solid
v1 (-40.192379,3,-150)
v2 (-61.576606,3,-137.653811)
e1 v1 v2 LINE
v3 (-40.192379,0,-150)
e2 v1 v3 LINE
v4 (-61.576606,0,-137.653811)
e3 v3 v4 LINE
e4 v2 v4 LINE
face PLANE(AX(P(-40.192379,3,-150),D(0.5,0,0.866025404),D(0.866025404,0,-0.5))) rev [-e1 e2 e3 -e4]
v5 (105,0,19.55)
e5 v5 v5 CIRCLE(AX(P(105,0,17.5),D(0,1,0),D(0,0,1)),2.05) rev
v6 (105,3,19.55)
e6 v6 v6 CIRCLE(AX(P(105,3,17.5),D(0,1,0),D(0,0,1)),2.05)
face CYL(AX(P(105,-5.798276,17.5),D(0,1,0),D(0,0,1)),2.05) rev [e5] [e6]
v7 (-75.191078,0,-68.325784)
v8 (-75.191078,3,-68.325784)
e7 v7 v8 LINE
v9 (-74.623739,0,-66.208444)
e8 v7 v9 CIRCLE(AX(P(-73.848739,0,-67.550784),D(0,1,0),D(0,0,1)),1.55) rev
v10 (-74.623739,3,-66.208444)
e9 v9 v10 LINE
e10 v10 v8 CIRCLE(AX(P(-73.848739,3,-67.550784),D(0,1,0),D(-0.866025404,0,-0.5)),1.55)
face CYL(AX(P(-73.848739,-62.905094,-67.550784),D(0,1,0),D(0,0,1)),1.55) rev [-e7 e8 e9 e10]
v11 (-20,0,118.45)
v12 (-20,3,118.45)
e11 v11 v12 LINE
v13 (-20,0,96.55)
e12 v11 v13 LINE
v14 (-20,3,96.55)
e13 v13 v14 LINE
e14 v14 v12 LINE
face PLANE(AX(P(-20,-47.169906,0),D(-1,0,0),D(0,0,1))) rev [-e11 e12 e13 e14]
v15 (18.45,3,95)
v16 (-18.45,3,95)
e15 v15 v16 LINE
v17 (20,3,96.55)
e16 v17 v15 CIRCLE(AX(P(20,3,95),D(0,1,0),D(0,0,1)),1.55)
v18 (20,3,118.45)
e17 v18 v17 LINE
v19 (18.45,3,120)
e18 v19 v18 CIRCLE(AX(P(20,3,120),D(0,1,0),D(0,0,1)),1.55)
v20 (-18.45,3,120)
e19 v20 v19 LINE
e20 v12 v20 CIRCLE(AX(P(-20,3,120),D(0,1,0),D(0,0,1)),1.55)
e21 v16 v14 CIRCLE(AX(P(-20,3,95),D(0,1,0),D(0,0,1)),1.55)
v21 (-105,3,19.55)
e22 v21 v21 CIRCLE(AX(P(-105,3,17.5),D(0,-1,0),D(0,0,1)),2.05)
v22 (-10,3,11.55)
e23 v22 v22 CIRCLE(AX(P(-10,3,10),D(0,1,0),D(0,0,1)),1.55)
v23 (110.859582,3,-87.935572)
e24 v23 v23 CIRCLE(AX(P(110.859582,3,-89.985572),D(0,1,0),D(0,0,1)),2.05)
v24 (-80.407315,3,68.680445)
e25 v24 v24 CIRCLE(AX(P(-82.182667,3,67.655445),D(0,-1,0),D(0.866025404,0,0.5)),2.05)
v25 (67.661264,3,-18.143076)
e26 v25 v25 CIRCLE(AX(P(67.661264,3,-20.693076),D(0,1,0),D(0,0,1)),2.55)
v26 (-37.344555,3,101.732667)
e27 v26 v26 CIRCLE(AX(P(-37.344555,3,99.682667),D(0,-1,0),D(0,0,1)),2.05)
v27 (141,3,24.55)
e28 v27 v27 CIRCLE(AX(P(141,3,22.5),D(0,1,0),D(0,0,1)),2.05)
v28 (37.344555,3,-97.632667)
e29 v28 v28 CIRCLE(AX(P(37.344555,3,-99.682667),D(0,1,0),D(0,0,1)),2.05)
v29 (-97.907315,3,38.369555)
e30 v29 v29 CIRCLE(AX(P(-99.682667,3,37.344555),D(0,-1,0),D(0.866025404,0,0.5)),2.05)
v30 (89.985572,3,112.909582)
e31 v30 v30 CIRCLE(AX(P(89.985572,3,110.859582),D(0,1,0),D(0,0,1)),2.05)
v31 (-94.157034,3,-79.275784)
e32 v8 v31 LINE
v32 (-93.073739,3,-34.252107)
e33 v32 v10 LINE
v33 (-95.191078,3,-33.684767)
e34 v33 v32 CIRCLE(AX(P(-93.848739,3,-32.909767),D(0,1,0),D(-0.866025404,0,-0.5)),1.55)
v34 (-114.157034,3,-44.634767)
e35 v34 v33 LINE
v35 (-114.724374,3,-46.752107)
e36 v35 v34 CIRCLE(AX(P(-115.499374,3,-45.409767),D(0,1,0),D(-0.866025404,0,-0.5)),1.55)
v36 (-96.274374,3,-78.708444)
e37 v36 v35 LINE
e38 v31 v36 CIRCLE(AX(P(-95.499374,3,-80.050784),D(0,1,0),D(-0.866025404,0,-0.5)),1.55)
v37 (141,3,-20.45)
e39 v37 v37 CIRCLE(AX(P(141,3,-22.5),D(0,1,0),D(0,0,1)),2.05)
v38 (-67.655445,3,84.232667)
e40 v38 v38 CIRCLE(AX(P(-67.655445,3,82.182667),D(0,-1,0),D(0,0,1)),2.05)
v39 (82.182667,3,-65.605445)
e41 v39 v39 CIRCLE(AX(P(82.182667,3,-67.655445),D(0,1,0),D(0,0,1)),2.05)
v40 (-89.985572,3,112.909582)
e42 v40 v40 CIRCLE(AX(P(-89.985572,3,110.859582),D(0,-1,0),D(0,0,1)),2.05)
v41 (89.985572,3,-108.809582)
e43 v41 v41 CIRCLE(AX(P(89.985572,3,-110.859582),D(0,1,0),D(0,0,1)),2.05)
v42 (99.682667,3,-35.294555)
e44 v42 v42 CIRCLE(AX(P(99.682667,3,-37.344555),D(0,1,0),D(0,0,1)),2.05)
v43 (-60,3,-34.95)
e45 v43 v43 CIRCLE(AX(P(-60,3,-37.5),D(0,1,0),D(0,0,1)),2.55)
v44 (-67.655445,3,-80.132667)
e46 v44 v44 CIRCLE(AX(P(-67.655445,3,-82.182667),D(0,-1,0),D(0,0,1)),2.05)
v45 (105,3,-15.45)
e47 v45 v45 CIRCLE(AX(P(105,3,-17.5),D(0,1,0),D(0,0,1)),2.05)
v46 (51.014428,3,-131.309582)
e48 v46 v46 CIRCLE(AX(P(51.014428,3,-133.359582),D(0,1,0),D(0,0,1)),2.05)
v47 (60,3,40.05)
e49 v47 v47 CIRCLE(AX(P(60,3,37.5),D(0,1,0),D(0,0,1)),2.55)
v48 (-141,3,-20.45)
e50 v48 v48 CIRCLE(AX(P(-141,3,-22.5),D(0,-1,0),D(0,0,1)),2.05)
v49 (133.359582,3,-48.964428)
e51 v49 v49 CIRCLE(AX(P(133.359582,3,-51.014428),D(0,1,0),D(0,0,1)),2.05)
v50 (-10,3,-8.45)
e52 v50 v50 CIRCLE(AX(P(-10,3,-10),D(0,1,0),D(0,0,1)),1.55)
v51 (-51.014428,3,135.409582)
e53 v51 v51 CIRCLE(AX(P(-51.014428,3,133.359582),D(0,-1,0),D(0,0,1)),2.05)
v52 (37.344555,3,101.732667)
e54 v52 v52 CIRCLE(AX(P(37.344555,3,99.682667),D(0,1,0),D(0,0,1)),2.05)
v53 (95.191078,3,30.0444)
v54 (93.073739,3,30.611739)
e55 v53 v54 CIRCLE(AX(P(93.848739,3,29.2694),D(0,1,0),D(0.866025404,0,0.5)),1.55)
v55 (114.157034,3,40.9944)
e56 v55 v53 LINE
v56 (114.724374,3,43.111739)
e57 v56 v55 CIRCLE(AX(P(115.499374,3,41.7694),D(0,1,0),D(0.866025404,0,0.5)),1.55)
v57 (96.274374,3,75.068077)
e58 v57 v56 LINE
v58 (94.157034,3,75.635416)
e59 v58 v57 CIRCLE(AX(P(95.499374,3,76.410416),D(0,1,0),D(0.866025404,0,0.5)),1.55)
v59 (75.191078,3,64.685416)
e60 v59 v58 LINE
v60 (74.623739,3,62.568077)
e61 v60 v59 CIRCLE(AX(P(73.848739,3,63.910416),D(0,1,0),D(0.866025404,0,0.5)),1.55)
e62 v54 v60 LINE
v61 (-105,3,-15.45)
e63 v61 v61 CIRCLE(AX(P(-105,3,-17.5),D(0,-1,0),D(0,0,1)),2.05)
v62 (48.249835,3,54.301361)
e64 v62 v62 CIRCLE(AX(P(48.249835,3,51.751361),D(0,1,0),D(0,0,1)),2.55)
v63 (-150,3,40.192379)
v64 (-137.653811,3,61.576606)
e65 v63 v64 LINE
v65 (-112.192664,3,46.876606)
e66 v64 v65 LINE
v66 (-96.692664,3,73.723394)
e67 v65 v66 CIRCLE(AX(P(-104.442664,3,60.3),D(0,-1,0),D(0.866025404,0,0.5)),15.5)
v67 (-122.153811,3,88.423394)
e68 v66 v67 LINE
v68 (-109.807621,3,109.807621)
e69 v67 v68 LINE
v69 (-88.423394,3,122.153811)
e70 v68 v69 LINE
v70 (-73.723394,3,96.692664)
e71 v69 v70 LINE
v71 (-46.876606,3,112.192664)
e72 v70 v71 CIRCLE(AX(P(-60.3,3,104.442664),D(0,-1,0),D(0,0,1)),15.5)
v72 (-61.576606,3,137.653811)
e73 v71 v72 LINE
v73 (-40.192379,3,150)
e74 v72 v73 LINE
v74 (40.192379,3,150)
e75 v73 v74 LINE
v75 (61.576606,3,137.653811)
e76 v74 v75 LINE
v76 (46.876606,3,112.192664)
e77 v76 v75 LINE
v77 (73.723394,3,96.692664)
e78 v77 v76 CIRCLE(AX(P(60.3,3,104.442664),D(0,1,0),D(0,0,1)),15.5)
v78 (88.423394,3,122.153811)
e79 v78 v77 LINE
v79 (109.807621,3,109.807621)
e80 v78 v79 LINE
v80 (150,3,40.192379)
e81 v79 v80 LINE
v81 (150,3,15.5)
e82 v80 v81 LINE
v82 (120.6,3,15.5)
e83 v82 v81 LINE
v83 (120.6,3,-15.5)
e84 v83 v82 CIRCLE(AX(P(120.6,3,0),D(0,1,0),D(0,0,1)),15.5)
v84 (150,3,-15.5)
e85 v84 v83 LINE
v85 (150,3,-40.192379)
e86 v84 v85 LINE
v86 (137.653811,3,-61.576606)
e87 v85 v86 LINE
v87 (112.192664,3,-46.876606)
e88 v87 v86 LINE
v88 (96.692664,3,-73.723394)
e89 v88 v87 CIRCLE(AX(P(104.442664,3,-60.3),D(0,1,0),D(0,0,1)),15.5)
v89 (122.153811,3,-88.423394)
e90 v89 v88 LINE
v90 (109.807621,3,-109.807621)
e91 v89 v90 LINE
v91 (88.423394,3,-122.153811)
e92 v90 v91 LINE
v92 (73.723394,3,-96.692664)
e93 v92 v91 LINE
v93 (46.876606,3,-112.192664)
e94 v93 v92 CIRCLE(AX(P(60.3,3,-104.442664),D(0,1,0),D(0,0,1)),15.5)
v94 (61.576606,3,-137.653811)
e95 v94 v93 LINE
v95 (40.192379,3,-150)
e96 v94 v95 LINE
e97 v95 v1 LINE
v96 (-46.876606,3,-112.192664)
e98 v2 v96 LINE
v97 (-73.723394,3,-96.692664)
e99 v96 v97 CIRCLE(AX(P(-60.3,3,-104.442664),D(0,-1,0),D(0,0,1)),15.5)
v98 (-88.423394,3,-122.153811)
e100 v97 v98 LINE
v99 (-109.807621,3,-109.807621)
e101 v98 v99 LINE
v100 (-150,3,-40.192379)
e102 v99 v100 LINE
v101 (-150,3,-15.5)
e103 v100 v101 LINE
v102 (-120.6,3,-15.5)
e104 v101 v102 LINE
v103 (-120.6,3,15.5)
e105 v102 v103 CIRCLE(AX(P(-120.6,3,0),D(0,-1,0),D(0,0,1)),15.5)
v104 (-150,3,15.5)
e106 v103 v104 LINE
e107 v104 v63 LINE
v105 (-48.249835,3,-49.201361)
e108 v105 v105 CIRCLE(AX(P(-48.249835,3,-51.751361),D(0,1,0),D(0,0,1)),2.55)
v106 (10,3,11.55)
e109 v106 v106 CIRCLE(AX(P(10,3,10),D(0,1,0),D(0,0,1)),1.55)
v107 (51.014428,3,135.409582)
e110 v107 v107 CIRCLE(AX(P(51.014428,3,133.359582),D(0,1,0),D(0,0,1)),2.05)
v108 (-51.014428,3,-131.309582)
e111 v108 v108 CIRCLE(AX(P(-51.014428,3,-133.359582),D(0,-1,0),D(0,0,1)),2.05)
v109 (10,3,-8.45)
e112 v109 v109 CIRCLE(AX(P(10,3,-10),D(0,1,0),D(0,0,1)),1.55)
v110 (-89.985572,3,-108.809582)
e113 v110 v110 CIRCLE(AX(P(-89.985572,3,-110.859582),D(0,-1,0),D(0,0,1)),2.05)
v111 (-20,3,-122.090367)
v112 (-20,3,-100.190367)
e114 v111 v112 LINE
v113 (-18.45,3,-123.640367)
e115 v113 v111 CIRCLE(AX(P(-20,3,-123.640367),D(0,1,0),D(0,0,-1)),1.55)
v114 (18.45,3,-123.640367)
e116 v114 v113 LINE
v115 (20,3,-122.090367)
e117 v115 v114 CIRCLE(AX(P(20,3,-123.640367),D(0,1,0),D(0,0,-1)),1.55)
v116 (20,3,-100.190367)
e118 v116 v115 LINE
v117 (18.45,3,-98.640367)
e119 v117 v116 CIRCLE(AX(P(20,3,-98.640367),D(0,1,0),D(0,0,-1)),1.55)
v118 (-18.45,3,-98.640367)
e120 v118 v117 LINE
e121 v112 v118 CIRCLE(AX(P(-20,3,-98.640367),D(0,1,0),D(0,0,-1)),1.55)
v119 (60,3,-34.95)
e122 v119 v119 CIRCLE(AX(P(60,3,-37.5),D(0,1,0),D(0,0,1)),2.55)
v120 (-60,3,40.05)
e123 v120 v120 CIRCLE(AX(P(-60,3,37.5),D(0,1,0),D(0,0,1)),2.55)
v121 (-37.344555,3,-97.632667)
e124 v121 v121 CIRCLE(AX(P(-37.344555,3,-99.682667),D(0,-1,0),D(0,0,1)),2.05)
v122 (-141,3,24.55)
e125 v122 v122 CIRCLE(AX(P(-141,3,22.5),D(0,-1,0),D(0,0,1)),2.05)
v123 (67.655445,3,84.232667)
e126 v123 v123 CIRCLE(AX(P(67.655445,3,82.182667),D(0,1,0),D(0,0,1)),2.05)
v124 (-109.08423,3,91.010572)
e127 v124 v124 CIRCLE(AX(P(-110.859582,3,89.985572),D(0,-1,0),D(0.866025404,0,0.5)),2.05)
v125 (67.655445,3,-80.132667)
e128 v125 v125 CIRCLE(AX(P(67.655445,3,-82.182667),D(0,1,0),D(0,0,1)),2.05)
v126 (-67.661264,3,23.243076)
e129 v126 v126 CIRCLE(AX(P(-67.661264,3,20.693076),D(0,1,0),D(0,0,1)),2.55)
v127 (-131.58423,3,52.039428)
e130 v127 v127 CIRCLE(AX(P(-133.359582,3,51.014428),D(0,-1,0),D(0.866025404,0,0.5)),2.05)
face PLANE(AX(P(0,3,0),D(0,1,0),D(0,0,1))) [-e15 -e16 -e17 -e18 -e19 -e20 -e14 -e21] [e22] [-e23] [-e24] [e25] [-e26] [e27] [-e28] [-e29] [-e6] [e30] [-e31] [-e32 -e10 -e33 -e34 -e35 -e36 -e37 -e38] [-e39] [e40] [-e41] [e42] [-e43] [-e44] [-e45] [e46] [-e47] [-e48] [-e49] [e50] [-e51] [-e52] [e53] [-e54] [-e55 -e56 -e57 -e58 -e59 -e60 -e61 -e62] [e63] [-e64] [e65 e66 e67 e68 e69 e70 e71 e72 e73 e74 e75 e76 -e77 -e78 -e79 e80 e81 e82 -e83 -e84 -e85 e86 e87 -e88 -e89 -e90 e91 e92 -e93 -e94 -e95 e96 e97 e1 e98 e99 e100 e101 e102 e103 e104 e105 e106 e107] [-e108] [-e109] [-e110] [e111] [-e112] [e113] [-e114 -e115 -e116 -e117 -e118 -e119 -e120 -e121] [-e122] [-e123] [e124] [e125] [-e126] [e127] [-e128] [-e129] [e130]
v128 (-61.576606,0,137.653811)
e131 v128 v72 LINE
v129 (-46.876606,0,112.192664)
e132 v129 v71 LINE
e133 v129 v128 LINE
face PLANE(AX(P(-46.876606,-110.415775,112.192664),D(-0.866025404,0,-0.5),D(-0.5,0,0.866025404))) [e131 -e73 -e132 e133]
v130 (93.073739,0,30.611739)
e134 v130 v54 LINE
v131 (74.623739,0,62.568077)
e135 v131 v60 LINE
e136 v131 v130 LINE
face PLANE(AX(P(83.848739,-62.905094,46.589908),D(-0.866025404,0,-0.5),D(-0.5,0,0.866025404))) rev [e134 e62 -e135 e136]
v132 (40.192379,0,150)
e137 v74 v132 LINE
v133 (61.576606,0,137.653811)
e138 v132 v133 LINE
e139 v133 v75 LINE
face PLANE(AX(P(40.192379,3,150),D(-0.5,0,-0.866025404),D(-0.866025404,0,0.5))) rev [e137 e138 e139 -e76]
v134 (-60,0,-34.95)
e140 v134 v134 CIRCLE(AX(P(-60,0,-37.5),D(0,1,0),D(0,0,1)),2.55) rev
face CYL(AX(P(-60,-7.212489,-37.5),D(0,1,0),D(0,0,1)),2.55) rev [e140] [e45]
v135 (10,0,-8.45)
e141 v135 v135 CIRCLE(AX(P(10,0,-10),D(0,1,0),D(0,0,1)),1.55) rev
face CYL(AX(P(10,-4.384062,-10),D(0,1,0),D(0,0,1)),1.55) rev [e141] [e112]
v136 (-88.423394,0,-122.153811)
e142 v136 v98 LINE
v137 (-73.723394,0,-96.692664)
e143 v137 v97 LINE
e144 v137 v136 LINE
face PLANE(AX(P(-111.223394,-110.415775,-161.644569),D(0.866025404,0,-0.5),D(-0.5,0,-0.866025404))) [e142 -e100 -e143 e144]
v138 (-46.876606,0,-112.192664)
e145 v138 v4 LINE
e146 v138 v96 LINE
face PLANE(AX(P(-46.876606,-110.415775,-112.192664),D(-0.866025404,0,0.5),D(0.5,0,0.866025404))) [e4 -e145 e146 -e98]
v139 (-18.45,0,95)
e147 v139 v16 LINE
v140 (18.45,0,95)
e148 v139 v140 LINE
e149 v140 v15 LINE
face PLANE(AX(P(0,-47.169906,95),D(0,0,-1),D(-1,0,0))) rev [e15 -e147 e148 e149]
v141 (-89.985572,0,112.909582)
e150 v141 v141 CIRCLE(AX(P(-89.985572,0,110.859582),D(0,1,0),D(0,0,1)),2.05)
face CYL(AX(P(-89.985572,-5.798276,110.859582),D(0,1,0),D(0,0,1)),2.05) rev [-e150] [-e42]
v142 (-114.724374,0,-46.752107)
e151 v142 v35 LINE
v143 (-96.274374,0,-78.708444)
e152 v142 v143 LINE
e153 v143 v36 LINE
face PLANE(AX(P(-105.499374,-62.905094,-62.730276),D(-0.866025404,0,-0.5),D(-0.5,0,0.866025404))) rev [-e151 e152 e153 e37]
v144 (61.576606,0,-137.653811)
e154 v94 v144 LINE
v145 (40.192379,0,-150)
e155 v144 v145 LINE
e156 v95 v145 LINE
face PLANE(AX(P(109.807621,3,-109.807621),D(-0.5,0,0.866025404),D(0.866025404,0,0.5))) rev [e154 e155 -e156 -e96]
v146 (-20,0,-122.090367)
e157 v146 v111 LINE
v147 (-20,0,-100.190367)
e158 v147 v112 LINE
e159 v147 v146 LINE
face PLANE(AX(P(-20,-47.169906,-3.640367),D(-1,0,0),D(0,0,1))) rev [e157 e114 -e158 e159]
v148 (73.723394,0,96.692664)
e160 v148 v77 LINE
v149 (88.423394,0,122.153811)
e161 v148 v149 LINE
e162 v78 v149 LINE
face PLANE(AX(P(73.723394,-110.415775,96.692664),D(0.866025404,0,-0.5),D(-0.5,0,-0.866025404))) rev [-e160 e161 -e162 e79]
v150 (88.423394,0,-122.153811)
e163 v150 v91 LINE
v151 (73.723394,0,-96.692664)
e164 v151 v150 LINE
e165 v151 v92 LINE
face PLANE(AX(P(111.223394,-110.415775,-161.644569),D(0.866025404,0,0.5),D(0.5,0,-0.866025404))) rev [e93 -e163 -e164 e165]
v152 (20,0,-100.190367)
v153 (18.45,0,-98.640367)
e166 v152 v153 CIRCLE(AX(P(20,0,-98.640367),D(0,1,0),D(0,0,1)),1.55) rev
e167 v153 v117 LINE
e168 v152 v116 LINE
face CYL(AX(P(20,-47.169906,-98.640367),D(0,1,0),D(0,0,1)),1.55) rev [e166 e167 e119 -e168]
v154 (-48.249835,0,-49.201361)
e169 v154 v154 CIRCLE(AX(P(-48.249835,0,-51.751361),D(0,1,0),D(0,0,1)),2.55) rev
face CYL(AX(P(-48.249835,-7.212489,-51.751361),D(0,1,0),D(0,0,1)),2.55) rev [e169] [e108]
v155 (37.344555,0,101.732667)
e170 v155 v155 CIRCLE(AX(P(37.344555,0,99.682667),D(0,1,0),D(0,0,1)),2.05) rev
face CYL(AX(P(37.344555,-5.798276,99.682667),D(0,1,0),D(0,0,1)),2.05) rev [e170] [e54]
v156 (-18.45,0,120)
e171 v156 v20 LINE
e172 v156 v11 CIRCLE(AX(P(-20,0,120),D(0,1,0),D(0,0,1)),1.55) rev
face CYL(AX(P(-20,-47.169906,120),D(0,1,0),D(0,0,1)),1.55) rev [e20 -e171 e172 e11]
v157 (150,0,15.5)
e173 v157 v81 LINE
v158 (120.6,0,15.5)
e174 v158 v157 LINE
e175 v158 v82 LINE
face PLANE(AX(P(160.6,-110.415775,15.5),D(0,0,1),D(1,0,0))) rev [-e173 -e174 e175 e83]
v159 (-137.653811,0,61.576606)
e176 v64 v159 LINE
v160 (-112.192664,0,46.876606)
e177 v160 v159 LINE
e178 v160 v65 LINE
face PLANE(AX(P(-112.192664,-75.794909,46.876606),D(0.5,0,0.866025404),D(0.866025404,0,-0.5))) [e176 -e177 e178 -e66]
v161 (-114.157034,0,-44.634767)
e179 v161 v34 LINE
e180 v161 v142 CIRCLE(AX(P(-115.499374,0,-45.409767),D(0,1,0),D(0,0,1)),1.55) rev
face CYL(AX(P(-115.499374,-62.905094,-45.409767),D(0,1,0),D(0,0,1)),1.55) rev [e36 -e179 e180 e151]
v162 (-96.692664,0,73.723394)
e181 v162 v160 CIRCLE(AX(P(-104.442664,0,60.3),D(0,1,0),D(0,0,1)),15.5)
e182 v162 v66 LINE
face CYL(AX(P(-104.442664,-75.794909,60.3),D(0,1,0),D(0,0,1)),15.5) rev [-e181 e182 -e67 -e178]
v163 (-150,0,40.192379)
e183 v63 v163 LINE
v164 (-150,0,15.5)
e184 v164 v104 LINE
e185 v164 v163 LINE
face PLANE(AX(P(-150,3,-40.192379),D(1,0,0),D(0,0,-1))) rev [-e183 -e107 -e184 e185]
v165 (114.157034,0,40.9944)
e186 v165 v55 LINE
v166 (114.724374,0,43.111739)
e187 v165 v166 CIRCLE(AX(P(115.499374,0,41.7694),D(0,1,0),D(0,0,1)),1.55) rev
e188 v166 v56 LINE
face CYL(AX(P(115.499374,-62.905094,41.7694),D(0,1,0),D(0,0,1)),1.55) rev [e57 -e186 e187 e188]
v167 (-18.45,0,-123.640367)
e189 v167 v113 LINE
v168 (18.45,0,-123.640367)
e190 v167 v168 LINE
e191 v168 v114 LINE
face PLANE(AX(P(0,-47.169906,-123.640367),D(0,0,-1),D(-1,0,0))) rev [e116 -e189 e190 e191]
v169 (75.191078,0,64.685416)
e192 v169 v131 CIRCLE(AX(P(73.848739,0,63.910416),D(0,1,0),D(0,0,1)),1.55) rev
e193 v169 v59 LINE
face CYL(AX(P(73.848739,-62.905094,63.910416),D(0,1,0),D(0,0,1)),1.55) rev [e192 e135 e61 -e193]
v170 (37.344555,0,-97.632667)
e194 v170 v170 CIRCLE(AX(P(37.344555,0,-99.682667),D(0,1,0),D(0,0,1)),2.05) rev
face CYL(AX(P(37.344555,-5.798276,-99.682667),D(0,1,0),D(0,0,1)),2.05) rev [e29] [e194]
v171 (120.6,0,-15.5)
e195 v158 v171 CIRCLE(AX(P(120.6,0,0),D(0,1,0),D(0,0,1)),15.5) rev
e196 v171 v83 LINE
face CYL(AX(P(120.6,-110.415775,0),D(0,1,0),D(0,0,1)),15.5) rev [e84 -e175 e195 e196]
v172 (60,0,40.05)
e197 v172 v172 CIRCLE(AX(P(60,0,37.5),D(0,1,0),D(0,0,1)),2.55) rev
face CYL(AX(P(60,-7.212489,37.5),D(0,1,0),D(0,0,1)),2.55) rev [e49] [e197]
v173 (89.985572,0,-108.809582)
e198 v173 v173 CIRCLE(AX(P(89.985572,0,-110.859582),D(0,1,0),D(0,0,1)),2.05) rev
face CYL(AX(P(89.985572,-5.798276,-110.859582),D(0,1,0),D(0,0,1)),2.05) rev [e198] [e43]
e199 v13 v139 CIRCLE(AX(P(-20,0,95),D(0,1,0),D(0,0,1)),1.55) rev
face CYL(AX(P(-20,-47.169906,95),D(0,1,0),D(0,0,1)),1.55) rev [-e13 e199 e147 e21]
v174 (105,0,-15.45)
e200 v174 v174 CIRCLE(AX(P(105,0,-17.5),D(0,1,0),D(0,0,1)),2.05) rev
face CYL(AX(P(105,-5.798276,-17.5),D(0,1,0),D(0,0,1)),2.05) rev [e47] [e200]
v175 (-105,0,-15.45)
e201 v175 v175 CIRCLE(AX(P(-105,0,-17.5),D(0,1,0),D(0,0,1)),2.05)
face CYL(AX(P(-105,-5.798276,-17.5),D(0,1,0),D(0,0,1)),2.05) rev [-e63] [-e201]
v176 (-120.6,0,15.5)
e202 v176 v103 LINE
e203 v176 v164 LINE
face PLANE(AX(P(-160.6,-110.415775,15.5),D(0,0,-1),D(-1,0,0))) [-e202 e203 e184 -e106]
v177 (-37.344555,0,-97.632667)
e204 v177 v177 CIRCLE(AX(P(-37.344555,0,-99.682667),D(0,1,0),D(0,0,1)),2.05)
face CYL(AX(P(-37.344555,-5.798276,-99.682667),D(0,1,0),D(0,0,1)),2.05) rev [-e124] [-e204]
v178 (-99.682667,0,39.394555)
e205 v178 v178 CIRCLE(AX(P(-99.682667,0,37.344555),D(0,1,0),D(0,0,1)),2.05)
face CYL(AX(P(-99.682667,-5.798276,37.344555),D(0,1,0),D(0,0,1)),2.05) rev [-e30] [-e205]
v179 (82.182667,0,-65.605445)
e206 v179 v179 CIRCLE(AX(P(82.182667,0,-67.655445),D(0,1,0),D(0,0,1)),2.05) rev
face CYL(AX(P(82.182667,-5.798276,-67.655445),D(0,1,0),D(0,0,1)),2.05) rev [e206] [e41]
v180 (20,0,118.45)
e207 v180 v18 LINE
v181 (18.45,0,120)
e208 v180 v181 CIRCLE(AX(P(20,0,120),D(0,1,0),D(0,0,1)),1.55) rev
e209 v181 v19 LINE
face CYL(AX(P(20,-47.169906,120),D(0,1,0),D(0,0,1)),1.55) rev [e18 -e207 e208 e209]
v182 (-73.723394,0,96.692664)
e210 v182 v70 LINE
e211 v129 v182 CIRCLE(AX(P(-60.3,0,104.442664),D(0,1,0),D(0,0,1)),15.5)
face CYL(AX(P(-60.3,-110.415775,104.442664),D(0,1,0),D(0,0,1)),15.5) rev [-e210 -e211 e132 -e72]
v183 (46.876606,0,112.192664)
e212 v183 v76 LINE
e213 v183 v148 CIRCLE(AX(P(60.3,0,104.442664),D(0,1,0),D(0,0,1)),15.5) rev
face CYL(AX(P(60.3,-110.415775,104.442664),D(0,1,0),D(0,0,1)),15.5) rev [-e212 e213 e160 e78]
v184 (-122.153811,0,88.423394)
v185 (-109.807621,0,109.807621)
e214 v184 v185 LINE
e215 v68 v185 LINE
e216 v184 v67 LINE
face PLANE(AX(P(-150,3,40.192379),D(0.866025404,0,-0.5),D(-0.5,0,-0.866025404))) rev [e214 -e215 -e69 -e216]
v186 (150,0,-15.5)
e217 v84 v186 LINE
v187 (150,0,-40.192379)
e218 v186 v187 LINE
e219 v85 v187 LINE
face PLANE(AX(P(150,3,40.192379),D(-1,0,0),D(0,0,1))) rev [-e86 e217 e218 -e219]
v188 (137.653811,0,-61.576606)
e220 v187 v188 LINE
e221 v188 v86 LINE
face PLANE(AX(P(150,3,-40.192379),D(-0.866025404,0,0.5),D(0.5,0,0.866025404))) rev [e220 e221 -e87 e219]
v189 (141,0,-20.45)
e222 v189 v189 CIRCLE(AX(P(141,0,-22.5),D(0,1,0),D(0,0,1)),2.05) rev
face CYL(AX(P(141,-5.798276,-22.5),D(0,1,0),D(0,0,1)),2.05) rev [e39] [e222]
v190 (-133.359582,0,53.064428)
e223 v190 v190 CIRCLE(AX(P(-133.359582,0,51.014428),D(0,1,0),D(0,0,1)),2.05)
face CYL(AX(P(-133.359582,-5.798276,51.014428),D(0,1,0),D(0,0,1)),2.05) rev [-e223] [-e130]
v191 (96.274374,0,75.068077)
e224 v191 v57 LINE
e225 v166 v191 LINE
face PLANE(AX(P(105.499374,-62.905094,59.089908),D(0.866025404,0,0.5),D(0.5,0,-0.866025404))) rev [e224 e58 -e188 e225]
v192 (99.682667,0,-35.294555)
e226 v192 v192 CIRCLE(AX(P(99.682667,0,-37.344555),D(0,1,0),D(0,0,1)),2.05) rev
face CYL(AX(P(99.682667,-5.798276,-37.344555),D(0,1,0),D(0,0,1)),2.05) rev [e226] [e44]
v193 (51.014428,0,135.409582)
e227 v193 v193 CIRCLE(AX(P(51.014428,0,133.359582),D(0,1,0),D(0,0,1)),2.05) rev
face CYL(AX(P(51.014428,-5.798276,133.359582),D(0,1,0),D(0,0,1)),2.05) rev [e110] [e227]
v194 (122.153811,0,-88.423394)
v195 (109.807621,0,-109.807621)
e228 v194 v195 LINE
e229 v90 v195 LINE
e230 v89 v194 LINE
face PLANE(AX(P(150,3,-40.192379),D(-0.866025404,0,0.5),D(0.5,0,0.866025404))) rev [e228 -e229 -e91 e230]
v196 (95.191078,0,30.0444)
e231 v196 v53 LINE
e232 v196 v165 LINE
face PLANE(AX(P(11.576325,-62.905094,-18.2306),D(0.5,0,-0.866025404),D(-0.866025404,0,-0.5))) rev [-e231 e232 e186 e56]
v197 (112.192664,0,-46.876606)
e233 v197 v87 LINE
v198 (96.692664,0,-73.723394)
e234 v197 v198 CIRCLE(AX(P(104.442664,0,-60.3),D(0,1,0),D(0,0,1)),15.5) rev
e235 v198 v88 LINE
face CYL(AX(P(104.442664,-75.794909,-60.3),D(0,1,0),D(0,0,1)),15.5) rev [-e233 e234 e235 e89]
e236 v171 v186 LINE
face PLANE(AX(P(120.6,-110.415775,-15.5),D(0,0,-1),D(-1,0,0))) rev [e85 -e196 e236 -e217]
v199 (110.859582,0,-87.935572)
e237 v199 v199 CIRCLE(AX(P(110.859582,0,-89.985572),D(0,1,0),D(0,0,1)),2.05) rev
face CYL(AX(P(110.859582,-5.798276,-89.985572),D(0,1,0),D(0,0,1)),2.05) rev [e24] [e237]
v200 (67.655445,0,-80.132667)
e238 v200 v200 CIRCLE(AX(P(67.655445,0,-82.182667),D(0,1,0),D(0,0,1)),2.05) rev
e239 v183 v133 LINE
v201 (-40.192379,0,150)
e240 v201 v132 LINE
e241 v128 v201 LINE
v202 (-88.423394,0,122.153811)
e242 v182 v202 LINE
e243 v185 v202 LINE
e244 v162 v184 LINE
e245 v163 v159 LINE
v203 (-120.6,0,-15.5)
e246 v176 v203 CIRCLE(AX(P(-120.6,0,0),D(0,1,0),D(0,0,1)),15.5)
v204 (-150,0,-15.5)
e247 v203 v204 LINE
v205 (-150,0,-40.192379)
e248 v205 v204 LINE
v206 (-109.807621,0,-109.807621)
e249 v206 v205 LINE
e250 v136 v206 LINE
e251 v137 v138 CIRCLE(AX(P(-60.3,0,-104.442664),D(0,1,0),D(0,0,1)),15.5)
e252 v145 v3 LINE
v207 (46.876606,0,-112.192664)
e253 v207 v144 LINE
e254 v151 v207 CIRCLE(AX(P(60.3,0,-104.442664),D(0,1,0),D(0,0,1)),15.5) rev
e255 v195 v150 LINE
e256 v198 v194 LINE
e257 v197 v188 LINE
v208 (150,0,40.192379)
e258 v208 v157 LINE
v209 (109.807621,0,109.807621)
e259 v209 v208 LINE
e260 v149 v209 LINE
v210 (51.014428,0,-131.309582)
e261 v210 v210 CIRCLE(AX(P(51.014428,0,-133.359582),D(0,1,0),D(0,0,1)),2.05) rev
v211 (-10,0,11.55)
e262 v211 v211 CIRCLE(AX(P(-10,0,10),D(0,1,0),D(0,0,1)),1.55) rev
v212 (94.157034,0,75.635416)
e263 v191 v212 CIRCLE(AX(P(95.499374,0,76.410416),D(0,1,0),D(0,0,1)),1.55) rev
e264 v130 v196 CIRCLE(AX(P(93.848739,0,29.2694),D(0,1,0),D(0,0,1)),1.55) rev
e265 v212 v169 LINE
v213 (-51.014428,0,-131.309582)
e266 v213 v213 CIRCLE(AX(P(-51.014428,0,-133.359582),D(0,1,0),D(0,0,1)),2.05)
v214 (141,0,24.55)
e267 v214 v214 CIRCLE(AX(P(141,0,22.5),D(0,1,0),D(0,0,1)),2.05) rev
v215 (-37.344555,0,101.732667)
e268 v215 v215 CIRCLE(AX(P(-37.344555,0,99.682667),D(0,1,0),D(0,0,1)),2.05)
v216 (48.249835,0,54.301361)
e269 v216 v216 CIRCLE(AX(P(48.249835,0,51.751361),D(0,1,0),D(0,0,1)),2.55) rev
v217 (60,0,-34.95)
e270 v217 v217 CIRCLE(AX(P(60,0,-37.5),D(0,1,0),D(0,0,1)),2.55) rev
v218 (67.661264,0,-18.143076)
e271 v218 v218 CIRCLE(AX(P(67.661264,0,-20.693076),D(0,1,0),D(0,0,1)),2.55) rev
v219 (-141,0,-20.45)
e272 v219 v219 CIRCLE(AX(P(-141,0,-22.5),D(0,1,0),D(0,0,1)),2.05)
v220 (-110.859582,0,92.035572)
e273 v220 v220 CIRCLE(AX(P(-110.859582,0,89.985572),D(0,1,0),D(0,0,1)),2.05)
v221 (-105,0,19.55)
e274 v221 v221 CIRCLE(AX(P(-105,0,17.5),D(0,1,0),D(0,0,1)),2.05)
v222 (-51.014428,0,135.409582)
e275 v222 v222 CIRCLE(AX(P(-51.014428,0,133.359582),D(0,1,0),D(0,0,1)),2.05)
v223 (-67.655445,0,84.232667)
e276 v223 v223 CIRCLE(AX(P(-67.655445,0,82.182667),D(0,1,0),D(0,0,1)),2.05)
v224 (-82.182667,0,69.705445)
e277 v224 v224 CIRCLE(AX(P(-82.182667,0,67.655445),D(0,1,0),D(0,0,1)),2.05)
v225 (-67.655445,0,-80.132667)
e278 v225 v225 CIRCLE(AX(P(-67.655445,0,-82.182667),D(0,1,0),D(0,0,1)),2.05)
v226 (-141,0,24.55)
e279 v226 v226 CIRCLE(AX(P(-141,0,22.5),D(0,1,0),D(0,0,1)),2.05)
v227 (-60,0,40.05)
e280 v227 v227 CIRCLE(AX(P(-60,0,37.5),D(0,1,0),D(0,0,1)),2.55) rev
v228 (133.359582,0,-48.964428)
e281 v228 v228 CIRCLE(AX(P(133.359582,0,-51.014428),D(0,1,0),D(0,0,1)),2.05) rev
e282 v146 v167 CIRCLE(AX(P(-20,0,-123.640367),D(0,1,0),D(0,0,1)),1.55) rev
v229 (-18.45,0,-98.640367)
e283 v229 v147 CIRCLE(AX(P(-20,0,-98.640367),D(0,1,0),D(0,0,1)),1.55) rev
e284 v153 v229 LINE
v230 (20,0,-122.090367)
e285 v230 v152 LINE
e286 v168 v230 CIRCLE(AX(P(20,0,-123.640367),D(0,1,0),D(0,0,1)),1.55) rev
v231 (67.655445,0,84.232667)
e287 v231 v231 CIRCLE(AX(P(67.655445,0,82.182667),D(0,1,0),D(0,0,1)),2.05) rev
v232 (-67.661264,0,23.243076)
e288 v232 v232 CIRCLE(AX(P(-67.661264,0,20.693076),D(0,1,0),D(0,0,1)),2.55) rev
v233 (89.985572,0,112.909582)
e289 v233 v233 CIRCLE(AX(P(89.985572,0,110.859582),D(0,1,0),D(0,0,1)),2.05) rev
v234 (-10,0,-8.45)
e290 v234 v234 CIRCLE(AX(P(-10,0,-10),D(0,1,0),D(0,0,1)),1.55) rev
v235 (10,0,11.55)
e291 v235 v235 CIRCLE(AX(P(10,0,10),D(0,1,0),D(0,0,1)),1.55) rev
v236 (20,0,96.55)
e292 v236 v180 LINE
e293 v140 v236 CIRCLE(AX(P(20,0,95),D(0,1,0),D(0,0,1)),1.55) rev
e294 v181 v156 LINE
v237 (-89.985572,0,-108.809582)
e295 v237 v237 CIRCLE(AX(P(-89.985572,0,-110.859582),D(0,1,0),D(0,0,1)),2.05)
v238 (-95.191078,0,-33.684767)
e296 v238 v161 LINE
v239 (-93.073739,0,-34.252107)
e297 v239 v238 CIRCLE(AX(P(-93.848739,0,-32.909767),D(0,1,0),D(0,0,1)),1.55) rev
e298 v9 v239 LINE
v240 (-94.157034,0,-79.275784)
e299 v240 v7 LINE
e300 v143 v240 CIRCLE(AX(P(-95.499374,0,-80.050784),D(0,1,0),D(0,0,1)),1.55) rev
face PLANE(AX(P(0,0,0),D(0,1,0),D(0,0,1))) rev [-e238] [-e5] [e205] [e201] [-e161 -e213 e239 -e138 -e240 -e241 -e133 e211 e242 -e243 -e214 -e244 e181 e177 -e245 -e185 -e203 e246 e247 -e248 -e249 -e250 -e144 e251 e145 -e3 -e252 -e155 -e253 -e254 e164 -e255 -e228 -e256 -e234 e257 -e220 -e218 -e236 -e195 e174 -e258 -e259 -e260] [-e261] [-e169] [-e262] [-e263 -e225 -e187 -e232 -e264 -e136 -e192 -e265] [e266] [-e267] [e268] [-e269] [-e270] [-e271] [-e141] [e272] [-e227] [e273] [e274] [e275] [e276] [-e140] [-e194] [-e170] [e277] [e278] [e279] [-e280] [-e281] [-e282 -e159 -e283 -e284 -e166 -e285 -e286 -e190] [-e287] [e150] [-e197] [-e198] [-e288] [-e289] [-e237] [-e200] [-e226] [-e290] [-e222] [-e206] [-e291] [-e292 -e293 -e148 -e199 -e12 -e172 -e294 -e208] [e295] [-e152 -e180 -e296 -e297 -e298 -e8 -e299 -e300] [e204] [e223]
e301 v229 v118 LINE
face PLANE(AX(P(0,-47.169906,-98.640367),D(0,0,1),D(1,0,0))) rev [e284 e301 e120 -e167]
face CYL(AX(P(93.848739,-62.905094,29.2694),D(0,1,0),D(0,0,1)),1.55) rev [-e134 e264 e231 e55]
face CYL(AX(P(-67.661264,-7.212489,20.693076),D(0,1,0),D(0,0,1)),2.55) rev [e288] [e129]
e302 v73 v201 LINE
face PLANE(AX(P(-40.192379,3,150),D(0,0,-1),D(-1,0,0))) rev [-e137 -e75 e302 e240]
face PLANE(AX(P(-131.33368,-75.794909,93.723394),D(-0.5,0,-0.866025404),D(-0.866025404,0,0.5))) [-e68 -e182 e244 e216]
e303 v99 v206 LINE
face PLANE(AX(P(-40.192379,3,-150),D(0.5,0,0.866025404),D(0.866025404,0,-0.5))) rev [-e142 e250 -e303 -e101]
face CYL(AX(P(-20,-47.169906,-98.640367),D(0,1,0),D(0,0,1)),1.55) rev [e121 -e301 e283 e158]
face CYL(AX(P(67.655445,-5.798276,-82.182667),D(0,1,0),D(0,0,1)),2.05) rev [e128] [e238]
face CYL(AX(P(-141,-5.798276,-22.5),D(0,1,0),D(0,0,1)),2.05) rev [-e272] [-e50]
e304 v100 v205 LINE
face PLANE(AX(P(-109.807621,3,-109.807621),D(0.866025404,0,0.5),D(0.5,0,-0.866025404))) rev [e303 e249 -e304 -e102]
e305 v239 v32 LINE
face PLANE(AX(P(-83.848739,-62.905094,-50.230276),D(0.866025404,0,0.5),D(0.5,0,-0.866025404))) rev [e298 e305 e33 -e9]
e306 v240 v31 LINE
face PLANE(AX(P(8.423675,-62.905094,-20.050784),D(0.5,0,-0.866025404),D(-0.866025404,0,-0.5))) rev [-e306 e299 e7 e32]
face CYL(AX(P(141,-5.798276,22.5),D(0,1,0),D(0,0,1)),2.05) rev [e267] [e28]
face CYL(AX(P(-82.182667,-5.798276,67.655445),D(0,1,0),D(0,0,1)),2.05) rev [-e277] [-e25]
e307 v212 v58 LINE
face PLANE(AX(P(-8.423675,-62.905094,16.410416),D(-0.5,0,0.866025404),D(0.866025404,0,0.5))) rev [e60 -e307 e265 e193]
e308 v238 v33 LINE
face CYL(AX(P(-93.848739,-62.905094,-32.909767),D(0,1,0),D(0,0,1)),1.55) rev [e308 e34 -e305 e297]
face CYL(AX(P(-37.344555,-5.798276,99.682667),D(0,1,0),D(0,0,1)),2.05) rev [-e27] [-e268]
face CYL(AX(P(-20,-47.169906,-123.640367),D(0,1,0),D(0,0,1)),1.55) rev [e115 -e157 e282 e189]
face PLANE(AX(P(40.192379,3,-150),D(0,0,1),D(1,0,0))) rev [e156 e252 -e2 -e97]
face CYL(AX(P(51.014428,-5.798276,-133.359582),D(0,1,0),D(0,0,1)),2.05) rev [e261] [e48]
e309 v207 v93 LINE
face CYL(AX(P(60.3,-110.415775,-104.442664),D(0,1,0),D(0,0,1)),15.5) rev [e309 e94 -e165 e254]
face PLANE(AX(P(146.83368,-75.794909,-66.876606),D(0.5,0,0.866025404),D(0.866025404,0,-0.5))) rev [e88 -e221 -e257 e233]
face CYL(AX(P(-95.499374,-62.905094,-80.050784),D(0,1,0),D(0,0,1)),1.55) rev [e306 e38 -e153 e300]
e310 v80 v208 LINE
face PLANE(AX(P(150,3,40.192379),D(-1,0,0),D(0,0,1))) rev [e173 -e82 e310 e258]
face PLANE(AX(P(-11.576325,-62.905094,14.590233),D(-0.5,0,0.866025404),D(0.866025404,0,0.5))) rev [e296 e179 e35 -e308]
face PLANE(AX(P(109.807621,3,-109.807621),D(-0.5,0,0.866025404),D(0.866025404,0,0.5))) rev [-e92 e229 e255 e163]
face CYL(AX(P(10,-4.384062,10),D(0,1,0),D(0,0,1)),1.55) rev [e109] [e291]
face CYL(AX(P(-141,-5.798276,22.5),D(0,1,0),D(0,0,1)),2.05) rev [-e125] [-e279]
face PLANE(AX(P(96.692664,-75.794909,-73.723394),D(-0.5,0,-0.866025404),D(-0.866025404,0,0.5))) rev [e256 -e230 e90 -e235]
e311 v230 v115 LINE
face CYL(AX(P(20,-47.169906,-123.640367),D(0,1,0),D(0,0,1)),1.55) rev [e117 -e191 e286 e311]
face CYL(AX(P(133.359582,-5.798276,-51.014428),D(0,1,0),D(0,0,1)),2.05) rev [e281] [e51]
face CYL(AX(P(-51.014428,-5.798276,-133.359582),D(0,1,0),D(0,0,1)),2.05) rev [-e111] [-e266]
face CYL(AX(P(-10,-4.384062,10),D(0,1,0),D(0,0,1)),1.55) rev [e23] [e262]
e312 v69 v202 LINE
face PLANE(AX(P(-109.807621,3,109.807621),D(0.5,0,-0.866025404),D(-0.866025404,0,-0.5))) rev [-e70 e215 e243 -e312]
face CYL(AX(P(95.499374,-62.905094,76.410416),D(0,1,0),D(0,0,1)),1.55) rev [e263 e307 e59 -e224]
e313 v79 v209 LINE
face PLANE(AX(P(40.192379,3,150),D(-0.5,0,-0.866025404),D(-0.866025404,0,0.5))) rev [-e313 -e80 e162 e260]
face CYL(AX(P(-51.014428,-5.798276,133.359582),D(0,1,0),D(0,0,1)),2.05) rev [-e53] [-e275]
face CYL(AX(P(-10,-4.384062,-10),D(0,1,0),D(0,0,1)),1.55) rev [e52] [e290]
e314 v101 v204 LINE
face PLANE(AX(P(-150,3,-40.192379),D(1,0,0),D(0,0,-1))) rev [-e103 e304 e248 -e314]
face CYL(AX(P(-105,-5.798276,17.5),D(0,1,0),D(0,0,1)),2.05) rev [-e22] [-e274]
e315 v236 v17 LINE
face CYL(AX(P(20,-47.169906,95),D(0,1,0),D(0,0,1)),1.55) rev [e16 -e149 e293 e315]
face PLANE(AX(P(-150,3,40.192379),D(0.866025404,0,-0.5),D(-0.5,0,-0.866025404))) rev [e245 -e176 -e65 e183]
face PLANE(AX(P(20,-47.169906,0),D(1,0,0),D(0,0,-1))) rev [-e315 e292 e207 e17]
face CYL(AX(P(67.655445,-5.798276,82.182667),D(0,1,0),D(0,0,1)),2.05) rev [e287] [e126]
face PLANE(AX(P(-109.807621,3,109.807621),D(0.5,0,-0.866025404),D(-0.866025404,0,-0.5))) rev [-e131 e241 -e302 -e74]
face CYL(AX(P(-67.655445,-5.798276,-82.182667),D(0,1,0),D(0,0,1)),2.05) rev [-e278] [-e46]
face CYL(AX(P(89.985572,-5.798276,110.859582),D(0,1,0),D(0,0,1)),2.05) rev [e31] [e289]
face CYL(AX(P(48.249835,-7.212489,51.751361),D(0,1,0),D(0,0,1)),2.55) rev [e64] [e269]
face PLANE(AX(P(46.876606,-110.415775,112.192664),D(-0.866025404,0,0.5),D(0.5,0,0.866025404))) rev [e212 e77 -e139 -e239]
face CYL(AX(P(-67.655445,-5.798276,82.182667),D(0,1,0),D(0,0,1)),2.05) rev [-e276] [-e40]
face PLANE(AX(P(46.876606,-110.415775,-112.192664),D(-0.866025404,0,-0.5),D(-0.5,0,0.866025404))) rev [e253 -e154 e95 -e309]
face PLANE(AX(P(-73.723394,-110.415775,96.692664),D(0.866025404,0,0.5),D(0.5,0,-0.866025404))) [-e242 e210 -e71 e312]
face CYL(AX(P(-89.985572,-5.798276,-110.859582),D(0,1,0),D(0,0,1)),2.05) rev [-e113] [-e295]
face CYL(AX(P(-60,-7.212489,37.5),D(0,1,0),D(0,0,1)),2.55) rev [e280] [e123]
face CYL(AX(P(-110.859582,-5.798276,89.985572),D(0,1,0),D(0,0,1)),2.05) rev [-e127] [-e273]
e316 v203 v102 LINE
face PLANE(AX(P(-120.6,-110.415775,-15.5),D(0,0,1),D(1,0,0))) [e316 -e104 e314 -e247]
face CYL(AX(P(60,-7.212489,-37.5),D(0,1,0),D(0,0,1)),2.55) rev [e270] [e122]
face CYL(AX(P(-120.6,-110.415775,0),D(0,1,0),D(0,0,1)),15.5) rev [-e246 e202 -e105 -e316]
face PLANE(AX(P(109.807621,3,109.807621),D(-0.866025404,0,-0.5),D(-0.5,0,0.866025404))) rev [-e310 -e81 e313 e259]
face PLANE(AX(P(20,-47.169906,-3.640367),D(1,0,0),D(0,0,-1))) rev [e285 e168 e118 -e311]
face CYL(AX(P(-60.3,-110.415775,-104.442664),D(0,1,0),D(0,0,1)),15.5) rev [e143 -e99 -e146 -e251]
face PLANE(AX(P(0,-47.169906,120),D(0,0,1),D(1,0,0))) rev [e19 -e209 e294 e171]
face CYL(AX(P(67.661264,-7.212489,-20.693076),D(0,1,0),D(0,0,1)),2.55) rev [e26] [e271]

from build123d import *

# Parameters (mm, degrees)
BOSS_EXTRUDE1_DEPTH = 3
SKETCH2_R           = 2.05
HEXCUT1_DEPTH       = 3
SKETCH6_R           = 2.05
QUADCUT1_DEPTH      = 3
CUT_EXTRUDE3_DEPTH  = 3
CUT_EXTRUDE4_DEPTH  = 3
SKETCH10_R          = 2.55
HEXBATHOLES_DEPTH   = 3
SKETCH11_R          = 2.55
QUADBATHOLES_DEPTH  = 3
SKETCH13_R          = 1.55
PDBHOLES_DEPTH      = 3
SKETCH15_R          = 1.55
SKETCH15_W          = 40
SKETCH15_H          = 25
CUT_EXTRUDE8_DEPTH  = 3
ACCESSHOLES_DEPTH   = 3


# Read off the part's stored shape, not the designer's step: AccessHoles
with BuildPart() as part:
    # Sketch1 → Boss-Extrude1 (new body)
    with BuildSketch(Plane(origin=(0, 0, 0), x_dir=(1, 0, 0), z_dir=(0, 1, 0))):
        Polygon((150, -40.192378865), (150, 40.192378865), (109.807621135, 109.807621135), (40.192378865, 150), (-40.192378865, 150), (-109.807621135, 109.807621135), (-150, 40.192378865), (-150, -40.192378865), (-109.807621135, -109.807621135), (-40.192378865, -150), (40.192378865, -150), (109.807621135, -109.807621135), align=None)
    extrude(amount=BOSS_EXTRUDE1_DEPTH)

    # Sketch2 → HexCut1 (cut)
    with BuildSketch(Plane(origin=(0, 3, 0), x_dir=(1, 0, 0), z_dir=(0, 1, 0))):
        with Locations(Location((51.014428415, 133.359581934, 0), (0, 0, 270))):
            Circle(SKETCH2_R)
        with Locations(Location((37.344555434, 99.682667397, 0), (0, 0, 270))):
            Circle(SKETCH2_R)
        with Locations(Location((37.344555434, -99.682667397, 0), (0, 0, 270))):
            Circle(SKETCH2_R)
        with Locations(Location((51.014428415, -133.359581934, 0), (0, 0, 270))):
            Circle(SKETCH2_R)
        with Locations(Location((105, 17.5, 0), (0, 0, 270))):
            Circle(SKETCH2_R)
        with Locations(Location((141, 22.5, 0), (0, 0, 270))):
            Circle(SKETCH2_R)
        with Locations(Location((105, -17.5, 0), (0, 0, 270))):
            Circle(SKETCH2_R)
        with Locations(Location((141, -22.5, 0), (0, 0, 270))):
            Circle(SKETCH2_R)
        with Locations(Location((89.985571585, -110.859581934, 0), (0, 0, 270))):
            Circle(SKETCH2_R)
        with Locations(Location((67.655444566, -82.182667397, 0), (0, 0, 270))):
            Circle(SKETCH2_R)
        with Locations(Location((89.985571585, 110.859581934, 0), (0, 0, 270))):
            Circle(SKETCH2_R)
        with Locations(Location((67.655444566, 82.182667397, 0), (0, 0, 270))):
            Circle(SKETCH2_R)
    hexcut1 = extrude(amount=-HEXCUT1_DEPTH, mode=Mode.SUBTRACT)

    # HexCut2: HexCut1 across plane
    add(hexcut1.mirror(Plane(origin=(0, 0, 0), x_dir=(0, 0, 1), z_dir=(1, 0, 0))), mode=Mode.SUBTRACT)

    # Sketch6 → QuadCut1 (cut)
    with BuildSketch(Plane(origin=(0, 3, 0), x_dir=(1, 0, 0), z_dir=(0, 1, 0))):
        with Locations(Location((99.682667397, 37.344555434, 0), (0, 0, 270))):
            Circle(SKETCH6_R)
        with Locations(Location((133.359581934, 51.014428415, 0), (0, 0, 270))):
            Circle(SKETCH6_R)
        with Locations(Location((110.859581934, 89.985571585, 0), (0, 0, 270))):
            Circle(SKETCH6_R)
        with Locations(Location((82.182667397, 67.655444566, 0), (0, 0, 270))):
            Circle(SKETCH6_R)
    quadcut1 = extrude(amount=-QUADCUT1_DEPTH, mode=Mode.SUBTRACT)

    # Mirror1: QuadCut1 across plane
    add(quadcut1.mirror(Plane(origin=(0, 0, 0), x_dir=(0.5000000000000011, 0, 0.8660254037844378), z_dir=(0.8660254037844379, 0, -0.5000000000000012))), mode=Mode.SUBTRACT)

    # Sketch7 → Cut-Extrude3 (cut)
    with BuildSketch(Plane(origin=(0, 3, 0), x_dir=(1, 0, 0), z_dir=(0, 1, 0))):
        with BuildLine():
            Line((46.876606241, 112.192663696), (84.376606241, 177.14456898))
            Line((84.376606241, 177.14456898), (111.223393759, 161.64456898))
            Line((111.223393759, 161.64456898), (73.723393759, 96.692663696))
            ThreePointArc((73.723393759, 96.692663696), (52.55, 91.019269938), (46.876606241, 112.192663696))
        make_face()
        with BuildLine():
            Line((46.876606241, -112.192663696), (84.376606241, -177.14456898))
            Line((84.376606241, -177.14456898), (111.223393759, -161.64456898))
            Line((111.223393759, -161.64456898), (73.723393759, -96.692663696))
            ThreePointArc((73.723393759, -96.692663696), (52.55, -91.019269938), (46.876606241, -112.192663696))
        make_face()
        with BuildLine():
            Line((120.6, 15.5), (160.6, 15.5))
            Line((160.6, 15.5), (160.6, -15.5))
            Line((160.6, -15.5), (120.6, -15.5))
            ThreePointArc((120.6, -15.5), (105.1, 0), (120.6, 15.5))
        make_face()
    cut_extrude3 = extrude(amount=-CUT_EXTRUDE3_DEPTH, mode=Mode.SUBTRACT)

    # Mirror2: Cut-Extrude3 across plane
    add(cut_extrude3.mirror(Plane(origin=(0, 0, 0), x_dir=(0, 0, 1), z_dir=(1, 0, 0))), mode=Mode.SUBTRACT)

    # Sketch8 → Cut-Extrude4 (cut)
    with BuildSketch(Plane(origin=(0, 3, 0), x_dir=(1, 0, 0), z_dir=(0, 1, 0))):
        with BuildLine():
            Line((96.692663696, 73.723393759), (131.333679848, 93.723393759))
            Line((131.333679848, 93.723393759), (146.833679848, 66.876606241))
            Line((146.833679848, 66.876606241), (112.192663696, 46.876606241))
            ThreePointArc((112.192663696, 46.876606241), (91.019269938, 52.55), (96.692663696, 73.723393759))
        make_face()
    cut_extrude4 = extrude(amount=-CUT_EXTRUDE4_DEPTH, mode=Mode.SUBTRACT)

    # Mirror3: Cut-Extrude4 across plane
    add(cut_extrude4.mirror(Plane(origin=(0, 0, 0), x_dir=(0.5000000000000011, 0, 0.8660254037844378), z_dir=(0.8660254037844379, 0, -0.5000000000000012))), mode=Mode.SUBTRACT)

    # Sketch10 → HexBatHoles (cut)
    with BuildSketch(Plane(origin=(0, 3, 0), x_dir=(1, 0, 0), z_dir=(0, 1, 0))):
        with Locations(Location((60, 37.5, 0), (0, 0, 270))):
            Circle(SKETCH10_R)
        with Locations(Location((60, -37.5, 0), (0, 0, 270))):
            Circle(SKETCH10_R)
        with Locations(Location((-60, 37.5, 0), (0, 0, 270))):
            Circle(SKETCH10_R)
        with Locations(Location((-60, -37.5, 0), (0, 0, 270))):
            Circle(SKETCH10_R)
    extrude(amount=-HEXBATHOLES_DEPTH, mode=Mode.SUBTRACT)

    # Sketch11 → QuadBatHoles (cut)
    with BuildSketch(Plane(origin=(0, 3, 0), x_dir=(1, 0, 0), z_dir=(0, 1, 0))):
        with Locations(Location((67.661263769, 20.69307578, 0), (0, 0, 270))):
            Circle(SKETCH11_R)
        with Locations(Location((48.249835386, -51.751361192, 0), (0, 0, 270))):
            Circle(SKETCH11_R)
        with Locations(Location((-67.661263769, -20.69307578, 0), (0, 0, 270))):
            Circle(SKETCH11_R)
        with Locations(Location((-48.249835386, 51.751361192, 0), (0, 0, 270))):
            Circle(SKETCH11_R)
    extrude(amount=-QUADBATHOLES_DEPTH, mode=Mode.SUBTRACT)

    # Sketch13 → PDBHoles (cut)
    with BuildSketch(Plane(origin=(0, 3, 0), x_dir=(1, 0, 0), z_dir=(0, 1, 0))):
        with Locations(Location((-10, 10, 0), (0, 0, 270))):
            Circle(SKETCH13_R)
        with Locations(Location((10, 10, 0), (0, 0, 270))):
            Circle(SKETCH13_R)
        with Locations(Location((-10, -10, 0), (0, 0, 270))):
            Circle(SKETCH13_R)
        with Locations(Location((10, -10, 0), (0, 0, 270))):
            Circle(SKETCH13_R)
    extrude(amount=-PDBHOLES_DEPTH, mode=Mode.SUBTRACT)

    # Sketch15 → Cut-Extrude8 (cut)
    with BuildSketch(Plane(origin=(0, 3, 0), x_dir=(1, 0, 0), z_dir=(0, 1, 0))):
        with Locations((20, -95)):
            Circle(SKETCH15_R)
        with Locations((-20, -95)):
            Circle(SKETCH15_R)
        with Locations((-20, -120)):
            Circle(SKETCH15_R)
        with Locations((20, -120)):
            Circle(SKETCH15_R)
        with Locations((0, -107.5)):
            Rectangle(SKETCH15_W, SKETCH15_H)
        with BuildLine():
            ThreePointArc((-18.45, -95), (-21.096015511, -93.903984489), (-20, -96.55))
            Line((-20, -96.55), (-20, -95))
            Line((-20, -95), (-18.45, -95))
        make_face()
        with BuildLine():
            Line((-20, -95), (-20, -96.55))
            ThreePointArc((-20, -96.55), (-18.903984489, -96.096015511), (-18.45, -95))
            Line((-18.45, -95), (-20, -95))
        make_face()
        with BuildLine():
            ThreePointArc((18.45, -95), (18.903984489, -96.096015511), (20, -96.55))
            Line((20, -96.55), (20, -95))
            Line((20, -95), (18.45, -95))
        make_face()
        with BuildLine():
            Line((20, -95), (20, -96.55))
            ThreePointArc((20, -96.55), (21.096015511, -96.096015511), (21.55, -95))
            ThreePointArc((21.55, -95), (20, -93.45), (18.45, -95))
            Line((18.45, -95), (20, -95))
        make_face()
        with BuildLine():
            ThreePointArc((20, -118.45), (18.903984489, -118.903984489), (18.45, -120))
            Line((18.45, -120), (20, -120))
            Line((20, -120), (20, -118.45))
        make_face()
        with BuildLine():
            Line((20, -120), (18.45, -120))
            ThreePointArc((18.45, -120), (20, -121.55), (21.55, -120))
            ThreePointArc((21.55, -120), (21.096015511, -118.903984489), (20, -118.45))
            Line((20, -118.45), (20, -120))
        make_face()
        with BuildLine():
            Line((-20, -118.45), (-20, -120))
            Line((-20, -120), (-18.45, -120))
            ThreePointArc((-18.45, -120), (-18.903984489, -118.903984489), (-20, -118.45))
        make_face()
        with BuildLine():
            Line((-18.45, -120), (-20, -120))
            Line((-20, -120), (-20, -118.45))
            ThreePointArc((-20, -118.45), (-21.096015511, -121.096015511), (-18.45, -120))
        make_face()
    extrude(amount=-CUT_EXTRUDE8_DEPTH, mode=Mode.SUBTRACT)

    # AccessHoles outline → AccessHoles (cut)
    with BuildSketch(Plane(origin=(0, 0, 0), x_dir=(1, 0, 0), z_dir=(0, 1, 0))):
        with BuildLine():
            ThreePointArc((-18.45, 123.640367336), (-21.096015511, 124.736382847), (-20, 122.090367336))
            Line((-20, 122.090367336), (-20, 100.190367336))
            ThreePointArc((-20, 100.190367336), (-21.096015511, 97.544351825), (-18.45, 98.640367336))
            Line((-18.45, 98.640367336), (18.45, 98.640367336))
            ThreePointArc((18.45, 98.640367336), (21.096015511, 97.544351825), (20, 100.190367336))
            Line((20, 100.190367336), (20, 122.090367336))
            ThreePointArc((20, 122.090367336), (21.096015511, 124.736382847), (18.45, 123.640367336))
            Line((18.45, 123.640367336), (-18.45, 123.640367336))
        make_face()
        with BuildLine():
            ThreePointArc((114.72437375, -43.111739466), (116.996558781, -41.36823057), (114.157034374, -40.99440009))
            Line((114.157034374, -40.99440009), (95.191078031, -30.04440009))
            ThreePointArc((95.191078031, -30.04440009), (93.447569135, -27.77221506), (93.073738655, -30.611739466))
            Line((93.073738655, -30.611739466), (74.623738655, -62.568076866))
            ThreePointArc((74.623738655, -62.568076866), (72.351553625, -64.311585762), (75.191078031, -64.685416242))
            Line((75.191078031, -64.685416242), (94.157034374, -75.635416242))
            ThreePointArc((94.157034374, -75.635416242), (95.90054327, -77.907601273), (96.27437375, -75.068076866))
            Line((96.27437375, -75.068076866), (114.72437375, -43.111739466))
        make_face()
        with BuildLine():
            ThreePointArc((-74.623738655, 66.208444202), (-72.351553625, 67.951953098), (-75.191078031, 68.325783577))
            Line((-75.191078031, 68.325783577), (-94.157034374, 79.275783577))
            ThreePointArc((-94.157034374, 79.275783577), (-95.900543269, 81.547968608), (-96.27437375, 78.708444202))
            Line((-96.27437375, 78.708444202), (-114.72437375, 46.752106802))
            ThreePointArc((-114.72437375, 46.752106802), (-116.996558781, 45.008597906), (-114.157034374, 44.634767426))
            Line((-114.157034374, 44.634767426), (-95.191078031, 33.684767426))
            ThreePointArc((-95.191078031, 33.684767426), (-93.447569135, 31.412582395), (-93.073738655, 34.252106802))
            Line((-93.073738655, 34.252106802), (-74.623738655, 66.208444202))
        make_face()
    extrude(amount=ACCESSHOLES_DEPTH, mode=Mode.SUBTRACT)


solid = part.part
